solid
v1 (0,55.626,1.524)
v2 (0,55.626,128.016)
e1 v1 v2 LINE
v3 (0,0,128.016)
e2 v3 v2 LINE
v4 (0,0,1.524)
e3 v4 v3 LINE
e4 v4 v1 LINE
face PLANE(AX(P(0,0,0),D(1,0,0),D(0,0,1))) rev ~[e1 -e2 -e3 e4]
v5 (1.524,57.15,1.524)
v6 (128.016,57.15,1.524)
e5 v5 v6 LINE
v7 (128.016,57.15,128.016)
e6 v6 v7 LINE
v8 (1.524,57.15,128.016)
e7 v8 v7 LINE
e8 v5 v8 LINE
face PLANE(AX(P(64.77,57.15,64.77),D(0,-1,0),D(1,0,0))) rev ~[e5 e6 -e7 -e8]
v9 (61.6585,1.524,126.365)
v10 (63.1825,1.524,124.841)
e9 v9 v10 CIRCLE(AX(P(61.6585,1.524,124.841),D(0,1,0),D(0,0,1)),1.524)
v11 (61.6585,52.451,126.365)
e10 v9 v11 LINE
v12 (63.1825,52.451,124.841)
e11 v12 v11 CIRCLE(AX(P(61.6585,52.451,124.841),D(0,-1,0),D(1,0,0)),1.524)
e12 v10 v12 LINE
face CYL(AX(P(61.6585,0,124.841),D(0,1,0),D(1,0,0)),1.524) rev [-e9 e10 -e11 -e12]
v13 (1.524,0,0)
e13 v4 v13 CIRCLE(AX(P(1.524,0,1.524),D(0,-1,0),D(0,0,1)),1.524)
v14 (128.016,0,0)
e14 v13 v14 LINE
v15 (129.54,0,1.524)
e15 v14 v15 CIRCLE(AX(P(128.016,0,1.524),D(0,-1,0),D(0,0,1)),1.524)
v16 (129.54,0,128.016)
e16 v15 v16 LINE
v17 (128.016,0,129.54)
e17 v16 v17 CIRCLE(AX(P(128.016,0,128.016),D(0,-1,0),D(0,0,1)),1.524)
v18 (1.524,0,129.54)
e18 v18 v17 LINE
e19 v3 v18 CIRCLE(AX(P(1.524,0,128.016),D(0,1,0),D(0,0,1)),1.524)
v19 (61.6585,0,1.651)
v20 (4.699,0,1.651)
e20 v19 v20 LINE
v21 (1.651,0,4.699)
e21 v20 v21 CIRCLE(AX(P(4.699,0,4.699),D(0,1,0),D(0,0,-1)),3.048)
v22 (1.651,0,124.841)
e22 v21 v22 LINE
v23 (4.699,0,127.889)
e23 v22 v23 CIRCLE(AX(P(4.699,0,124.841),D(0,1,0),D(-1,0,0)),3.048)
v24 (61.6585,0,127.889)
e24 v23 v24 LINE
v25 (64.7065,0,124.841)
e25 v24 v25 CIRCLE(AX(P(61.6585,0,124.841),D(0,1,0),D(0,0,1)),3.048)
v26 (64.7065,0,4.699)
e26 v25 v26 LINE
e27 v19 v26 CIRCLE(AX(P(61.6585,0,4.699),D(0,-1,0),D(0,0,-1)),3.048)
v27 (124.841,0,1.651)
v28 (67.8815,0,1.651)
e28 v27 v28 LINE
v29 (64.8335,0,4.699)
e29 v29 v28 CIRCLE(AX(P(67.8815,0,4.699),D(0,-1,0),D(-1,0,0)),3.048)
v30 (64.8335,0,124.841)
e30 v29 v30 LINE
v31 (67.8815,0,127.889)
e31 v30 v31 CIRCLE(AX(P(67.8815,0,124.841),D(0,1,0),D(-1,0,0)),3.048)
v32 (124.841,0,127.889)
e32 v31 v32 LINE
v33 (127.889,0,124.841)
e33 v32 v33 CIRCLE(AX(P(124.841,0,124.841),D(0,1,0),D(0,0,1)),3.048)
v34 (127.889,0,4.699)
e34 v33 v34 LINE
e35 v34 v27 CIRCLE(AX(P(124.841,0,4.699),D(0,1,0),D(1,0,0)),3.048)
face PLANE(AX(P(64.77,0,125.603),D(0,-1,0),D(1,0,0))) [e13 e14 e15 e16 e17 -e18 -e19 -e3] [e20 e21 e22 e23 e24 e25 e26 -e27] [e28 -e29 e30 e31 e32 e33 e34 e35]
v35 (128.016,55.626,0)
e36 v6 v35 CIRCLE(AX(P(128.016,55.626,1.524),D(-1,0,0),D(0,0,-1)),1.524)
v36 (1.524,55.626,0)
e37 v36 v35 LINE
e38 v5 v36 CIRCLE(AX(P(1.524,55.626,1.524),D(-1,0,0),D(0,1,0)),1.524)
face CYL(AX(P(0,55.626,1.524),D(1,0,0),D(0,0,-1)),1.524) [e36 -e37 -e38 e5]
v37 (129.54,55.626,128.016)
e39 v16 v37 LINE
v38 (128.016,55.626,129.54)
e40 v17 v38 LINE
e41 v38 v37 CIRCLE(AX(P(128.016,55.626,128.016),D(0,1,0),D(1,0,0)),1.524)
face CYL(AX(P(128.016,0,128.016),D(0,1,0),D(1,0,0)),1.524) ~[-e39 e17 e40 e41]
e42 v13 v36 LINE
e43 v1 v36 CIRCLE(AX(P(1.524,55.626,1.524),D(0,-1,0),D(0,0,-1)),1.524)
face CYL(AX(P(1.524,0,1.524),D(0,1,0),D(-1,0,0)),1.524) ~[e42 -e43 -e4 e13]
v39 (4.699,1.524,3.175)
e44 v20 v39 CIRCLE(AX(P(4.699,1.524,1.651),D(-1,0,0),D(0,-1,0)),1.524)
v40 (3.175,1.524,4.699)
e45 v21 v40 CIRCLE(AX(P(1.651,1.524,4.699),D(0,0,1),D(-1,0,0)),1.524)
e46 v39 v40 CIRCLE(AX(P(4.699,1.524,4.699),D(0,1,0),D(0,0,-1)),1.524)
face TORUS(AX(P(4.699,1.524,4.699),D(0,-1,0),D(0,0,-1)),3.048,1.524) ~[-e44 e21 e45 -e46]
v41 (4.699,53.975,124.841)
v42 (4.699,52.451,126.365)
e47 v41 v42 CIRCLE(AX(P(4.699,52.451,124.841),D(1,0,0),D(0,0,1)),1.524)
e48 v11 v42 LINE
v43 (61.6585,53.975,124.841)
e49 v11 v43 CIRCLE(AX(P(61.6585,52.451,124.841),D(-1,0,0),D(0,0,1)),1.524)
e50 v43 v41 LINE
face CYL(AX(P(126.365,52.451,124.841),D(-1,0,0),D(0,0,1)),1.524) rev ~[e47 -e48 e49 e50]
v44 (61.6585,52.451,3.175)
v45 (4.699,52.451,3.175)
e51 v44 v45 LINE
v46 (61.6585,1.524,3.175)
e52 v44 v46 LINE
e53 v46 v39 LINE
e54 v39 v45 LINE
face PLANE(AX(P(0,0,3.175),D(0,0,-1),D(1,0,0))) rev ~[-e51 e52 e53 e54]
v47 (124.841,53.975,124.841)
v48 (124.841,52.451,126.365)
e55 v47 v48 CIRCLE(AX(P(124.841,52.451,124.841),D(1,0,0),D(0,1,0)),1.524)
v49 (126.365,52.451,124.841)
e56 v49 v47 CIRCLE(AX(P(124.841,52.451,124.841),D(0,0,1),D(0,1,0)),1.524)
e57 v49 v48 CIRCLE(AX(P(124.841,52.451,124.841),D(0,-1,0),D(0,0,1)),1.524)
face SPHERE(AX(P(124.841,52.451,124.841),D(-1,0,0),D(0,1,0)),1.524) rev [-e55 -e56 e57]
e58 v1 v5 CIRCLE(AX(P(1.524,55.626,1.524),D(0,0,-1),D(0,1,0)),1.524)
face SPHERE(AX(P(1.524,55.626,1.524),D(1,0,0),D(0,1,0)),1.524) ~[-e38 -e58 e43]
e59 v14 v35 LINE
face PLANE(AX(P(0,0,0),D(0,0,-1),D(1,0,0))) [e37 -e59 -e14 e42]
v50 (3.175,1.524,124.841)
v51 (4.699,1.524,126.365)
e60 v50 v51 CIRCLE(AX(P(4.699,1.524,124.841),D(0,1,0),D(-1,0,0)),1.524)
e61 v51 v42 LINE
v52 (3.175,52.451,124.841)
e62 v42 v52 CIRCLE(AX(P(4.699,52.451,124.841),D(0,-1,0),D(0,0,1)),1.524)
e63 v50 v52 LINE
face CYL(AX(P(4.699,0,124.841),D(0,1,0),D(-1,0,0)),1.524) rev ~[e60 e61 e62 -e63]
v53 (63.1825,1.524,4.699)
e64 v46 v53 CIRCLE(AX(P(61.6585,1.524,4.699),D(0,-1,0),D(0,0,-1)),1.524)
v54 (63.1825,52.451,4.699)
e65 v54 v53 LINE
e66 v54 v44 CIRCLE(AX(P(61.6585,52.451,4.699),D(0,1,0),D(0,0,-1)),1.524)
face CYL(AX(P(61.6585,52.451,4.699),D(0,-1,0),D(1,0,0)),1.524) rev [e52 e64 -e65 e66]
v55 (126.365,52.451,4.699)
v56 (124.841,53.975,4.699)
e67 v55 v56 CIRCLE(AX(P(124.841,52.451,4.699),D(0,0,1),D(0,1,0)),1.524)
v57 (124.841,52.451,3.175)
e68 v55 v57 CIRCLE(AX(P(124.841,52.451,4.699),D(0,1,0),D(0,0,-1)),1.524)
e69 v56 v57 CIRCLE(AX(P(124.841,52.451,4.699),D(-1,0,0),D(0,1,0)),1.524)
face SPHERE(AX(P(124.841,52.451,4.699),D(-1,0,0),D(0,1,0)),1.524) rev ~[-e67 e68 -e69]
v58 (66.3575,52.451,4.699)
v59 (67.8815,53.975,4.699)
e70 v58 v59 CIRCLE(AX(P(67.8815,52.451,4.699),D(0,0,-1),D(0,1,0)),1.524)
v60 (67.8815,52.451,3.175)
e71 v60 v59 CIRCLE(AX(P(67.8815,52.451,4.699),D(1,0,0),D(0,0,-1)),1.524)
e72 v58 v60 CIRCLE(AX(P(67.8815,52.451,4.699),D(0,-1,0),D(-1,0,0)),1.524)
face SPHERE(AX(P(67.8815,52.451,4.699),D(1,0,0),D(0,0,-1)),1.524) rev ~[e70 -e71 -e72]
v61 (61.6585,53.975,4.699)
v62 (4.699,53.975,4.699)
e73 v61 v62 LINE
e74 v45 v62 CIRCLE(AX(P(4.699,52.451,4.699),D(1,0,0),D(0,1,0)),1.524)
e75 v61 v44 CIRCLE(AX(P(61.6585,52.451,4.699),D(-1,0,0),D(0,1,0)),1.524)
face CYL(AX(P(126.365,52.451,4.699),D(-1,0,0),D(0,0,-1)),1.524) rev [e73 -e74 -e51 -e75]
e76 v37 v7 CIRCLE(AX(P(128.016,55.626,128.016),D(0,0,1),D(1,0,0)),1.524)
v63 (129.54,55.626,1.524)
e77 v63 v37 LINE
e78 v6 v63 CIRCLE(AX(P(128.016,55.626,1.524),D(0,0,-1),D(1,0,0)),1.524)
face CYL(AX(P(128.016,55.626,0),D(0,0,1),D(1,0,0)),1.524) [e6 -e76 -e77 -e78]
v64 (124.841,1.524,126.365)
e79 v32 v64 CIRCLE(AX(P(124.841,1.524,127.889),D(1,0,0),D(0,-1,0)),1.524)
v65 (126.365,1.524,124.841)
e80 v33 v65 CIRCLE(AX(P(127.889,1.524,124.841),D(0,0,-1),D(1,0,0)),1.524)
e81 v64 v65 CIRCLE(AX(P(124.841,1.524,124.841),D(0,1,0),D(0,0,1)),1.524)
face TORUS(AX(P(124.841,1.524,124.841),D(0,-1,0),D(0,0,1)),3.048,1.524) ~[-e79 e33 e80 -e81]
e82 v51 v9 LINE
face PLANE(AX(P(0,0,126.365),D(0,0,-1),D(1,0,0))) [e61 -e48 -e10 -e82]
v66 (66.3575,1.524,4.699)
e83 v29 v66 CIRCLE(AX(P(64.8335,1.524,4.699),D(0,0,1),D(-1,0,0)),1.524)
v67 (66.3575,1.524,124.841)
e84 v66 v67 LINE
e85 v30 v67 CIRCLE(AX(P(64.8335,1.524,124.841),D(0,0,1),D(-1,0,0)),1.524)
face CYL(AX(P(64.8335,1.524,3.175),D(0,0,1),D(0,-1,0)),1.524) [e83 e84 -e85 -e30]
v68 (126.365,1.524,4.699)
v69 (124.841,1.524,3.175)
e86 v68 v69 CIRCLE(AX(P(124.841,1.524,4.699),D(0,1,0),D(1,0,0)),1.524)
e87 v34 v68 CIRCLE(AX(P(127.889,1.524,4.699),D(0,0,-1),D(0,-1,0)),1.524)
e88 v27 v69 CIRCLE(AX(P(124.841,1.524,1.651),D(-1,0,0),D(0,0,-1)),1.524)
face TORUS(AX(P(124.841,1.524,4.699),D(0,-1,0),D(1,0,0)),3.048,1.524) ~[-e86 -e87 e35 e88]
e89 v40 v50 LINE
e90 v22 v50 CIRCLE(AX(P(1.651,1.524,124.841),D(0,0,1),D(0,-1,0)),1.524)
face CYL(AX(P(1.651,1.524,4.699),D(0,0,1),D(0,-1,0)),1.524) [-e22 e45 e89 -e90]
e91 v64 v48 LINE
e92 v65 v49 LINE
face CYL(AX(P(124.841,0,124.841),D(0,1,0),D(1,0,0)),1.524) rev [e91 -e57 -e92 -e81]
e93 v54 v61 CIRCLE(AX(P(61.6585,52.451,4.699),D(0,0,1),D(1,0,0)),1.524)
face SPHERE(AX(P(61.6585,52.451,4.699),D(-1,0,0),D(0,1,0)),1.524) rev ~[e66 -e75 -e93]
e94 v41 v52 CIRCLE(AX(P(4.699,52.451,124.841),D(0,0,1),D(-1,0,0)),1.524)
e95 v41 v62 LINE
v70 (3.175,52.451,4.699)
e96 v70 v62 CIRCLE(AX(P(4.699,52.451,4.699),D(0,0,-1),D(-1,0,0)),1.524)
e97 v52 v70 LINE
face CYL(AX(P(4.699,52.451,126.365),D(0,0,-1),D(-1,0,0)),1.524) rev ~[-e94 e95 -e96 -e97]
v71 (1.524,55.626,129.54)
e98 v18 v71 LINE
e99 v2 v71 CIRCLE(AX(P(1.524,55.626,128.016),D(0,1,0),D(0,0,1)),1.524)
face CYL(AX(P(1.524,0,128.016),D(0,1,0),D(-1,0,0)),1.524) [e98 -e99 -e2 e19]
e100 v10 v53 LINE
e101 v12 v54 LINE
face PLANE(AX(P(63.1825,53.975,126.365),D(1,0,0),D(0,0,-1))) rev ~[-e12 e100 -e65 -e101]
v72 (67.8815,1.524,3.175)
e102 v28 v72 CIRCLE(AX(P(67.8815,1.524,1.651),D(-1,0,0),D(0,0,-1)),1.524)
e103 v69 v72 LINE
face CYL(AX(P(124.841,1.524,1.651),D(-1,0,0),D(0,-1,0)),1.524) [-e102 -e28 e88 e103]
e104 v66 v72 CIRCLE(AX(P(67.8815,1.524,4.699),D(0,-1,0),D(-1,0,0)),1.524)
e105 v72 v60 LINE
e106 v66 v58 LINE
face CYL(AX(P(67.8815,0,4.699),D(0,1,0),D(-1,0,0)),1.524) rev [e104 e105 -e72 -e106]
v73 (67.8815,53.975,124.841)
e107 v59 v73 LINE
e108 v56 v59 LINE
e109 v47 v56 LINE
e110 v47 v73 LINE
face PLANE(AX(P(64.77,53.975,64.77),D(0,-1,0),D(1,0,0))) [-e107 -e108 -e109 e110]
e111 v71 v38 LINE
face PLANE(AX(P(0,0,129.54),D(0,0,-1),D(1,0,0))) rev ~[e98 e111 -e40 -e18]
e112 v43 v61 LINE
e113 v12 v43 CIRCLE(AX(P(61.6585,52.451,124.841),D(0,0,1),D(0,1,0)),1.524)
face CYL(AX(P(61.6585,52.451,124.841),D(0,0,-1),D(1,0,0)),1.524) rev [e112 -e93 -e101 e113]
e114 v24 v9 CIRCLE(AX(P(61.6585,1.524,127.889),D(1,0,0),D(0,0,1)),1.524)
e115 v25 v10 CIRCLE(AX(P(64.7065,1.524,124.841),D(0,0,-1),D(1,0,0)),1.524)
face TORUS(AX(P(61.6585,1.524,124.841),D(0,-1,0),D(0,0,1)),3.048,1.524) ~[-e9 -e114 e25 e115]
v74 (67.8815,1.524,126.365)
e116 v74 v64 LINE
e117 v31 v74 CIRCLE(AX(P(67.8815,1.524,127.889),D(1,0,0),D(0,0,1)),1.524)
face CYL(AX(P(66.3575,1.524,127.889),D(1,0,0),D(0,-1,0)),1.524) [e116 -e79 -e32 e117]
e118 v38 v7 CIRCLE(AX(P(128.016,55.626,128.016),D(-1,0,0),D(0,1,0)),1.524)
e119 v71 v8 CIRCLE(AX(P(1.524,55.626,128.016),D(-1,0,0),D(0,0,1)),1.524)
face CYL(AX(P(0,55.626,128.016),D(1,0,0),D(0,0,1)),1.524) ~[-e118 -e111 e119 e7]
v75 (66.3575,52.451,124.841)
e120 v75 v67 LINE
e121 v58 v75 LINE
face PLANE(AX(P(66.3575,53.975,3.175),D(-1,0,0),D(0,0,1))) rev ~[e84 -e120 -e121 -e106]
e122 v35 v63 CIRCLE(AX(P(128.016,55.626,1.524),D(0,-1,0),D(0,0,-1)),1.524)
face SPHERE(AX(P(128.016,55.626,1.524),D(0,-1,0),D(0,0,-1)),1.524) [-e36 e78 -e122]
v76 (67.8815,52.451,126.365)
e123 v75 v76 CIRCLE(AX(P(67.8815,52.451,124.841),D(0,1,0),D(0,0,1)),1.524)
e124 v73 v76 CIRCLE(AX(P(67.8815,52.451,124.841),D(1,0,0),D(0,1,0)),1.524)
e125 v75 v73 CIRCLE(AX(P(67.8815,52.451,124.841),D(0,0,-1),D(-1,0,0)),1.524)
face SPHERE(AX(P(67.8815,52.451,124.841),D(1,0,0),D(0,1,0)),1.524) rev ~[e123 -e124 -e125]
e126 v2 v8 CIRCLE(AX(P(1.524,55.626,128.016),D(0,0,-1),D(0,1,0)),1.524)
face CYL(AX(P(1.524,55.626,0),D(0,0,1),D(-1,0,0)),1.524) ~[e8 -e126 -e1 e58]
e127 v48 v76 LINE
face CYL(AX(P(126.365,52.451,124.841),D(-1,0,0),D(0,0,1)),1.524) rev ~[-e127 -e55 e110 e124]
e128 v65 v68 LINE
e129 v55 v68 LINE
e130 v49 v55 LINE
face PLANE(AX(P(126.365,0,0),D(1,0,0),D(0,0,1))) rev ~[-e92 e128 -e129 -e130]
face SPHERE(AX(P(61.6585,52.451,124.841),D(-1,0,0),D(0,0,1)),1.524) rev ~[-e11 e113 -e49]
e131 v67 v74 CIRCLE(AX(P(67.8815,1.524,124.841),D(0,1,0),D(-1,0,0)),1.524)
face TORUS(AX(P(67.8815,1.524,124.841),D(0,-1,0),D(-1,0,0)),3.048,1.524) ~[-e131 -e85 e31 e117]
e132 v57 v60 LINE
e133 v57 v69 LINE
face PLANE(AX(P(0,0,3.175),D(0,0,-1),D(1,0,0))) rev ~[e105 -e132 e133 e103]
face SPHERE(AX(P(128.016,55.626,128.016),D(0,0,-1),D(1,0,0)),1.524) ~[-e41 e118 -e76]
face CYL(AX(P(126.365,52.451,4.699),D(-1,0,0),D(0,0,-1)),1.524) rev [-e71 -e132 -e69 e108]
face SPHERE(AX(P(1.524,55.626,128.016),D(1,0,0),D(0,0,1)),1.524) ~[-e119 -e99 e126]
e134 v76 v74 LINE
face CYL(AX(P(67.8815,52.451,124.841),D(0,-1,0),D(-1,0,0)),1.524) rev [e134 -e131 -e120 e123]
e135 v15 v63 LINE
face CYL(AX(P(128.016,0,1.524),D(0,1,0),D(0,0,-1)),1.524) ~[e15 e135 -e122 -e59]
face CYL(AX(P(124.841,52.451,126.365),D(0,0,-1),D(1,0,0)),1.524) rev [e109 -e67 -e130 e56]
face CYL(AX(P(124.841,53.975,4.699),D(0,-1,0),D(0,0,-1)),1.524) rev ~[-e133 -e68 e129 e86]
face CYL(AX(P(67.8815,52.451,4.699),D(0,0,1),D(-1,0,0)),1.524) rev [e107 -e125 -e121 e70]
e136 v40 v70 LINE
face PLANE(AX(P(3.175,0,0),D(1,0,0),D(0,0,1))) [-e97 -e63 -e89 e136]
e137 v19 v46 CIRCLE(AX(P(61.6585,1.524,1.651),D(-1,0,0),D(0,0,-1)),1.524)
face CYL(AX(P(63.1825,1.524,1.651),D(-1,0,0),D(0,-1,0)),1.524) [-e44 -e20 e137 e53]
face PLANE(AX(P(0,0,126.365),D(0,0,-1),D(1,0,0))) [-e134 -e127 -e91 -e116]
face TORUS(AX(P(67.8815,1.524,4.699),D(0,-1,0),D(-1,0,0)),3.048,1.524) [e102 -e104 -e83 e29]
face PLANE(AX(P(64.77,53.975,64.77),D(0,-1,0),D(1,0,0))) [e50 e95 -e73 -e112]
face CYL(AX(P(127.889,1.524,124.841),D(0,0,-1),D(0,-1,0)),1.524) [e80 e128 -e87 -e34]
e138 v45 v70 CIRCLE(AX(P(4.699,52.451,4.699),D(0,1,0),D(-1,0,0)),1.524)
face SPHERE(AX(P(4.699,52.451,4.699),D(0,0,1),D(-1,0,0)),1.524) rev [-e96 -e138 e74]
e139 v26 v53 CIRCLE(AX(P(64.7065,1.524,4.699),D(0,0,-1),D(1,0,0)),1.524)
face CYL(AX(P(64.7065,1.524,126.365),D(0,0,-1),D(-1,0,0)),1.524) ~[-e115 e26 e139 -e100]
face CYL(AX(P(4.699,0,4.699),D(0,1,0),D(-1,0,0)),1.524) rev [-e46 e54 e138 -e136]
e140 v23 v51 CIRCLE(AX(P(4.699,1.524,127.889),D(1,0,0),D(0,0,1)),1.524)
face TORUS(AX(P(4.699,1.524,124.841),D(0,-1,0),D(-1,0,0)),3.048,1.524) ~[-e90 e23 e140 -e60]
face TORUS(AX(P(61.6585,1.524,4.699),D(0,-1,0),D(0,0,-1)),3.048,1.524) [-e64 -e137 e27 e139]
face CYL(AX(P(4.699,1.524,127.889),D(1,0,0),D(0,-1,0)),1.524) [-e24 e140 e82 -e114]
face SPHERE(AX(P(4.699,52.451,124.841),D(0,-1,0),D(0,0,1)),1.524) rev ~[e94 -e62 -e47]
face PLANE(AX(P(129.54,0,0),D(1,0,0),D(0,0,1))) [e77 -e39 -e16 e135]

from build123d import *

# Parameters (mm, degrees)
F0_W     = 129.54
F0_H     = 129.54
F1_DEPTH = 57.15
F2_T     = -3.175
F3_R     = 1.524
F4_R     = 1.524
F5_W     = 3.175
F5_H     = 1.524
F5_H_2   = 120.142
F6_DEPTH = 53.975
F7_R     = 1.524


with BuildPart() as f1:
    # F0 (on Front) → F1 (new body)
    with BuildSketch(Plane.XZ):
        with Locations((64.77, 64.77)):
            Rectangle(F0_W, F0_H)
    extrude(amount=-F1_DEPTH)

    # F2
    f2_openings = [f1.faces().sort_by_distance(p)[0] for p in [
        (64.77, 0, 64.77),
    ]]
    offset(amount=F2_T, openings=f2_openings)

    # F3
    f3_edges = [f1.edges().sort_by_distance(p)[0] for p in [
        (3.175, 26.9875, 126.365),
        (64.77, 53.975, 126.365),
        (3.175, 53.975, 64.77),
        (3.175, 26.9875, 3.175),
        (64.77, 53.975, 3.175),
        (126.365, 53.975, 64.77),
        (126.365, 26.9875, 126.365),
        (126.365, 26.9875, 3.175),
    ]]
    fillet(f3_edges, radius=F3_R)

    # F4
    f4_edges = [f1.edges().sort_by_distance(p)[0] for p in [
        (129.54, 28.575, 0),
        (64.77, 57.15, 0),
        (129.54, 57.15, 64.77),
        (129.54, 28.575, 129.54),
        (64.77, 57.15, 129.54),
        (0, 28.575, 129.54),
        (0, 57.15, 64.77),
        (0, 28.575, 0),
    ]]
    fillet(f4_edges, radius=F4_R)

    # F5 (on face) → F6 (join)
    with BuildSketch(Plane.XZ.offset(-53.975)):
        with Locations((64.77, 125.603)):
            Rectangle(F5_W, F5_H)
        with Locations((64.77, 64.77)):
            Rectangle(F5_W, F5_H_2)
        with Locations((64.77, 3.937)):
            Rectangle(F5_W, F5_H)
    extrude(amount=F6_DEPTH)

    # F7
    f7_edges = [f1.edges().sort_by_distance(p)[0] for p in [
        (33.94075, 0, 126.365),
        (63.1825, 0, 64.77),
        (63.1825, 53.528631, 125.918631),
        (63.1825, 53.975, 64.77),
        (63.1825, 53.528631, 3.621369),
        (63.1825, 26.2255, 3.175),
        (63.1825, 26.2255, 126.365),
        (95.59925, 0, 126.365),
        (66.3575, 26.2255, 126.365),
        (95.59925, 52.451, 126.365),
        (124.841, 26.2255, 126.365),
        (126.365, 0, 64.77),
        (126.365, 26.2255, 4.699),
        (126.365, 26.2255, 124.841),
        (126.365, 52.451, 64.77),
        (3.175, 0, 64.77),
        (3.621369, 0, 125.918631),
        (33.94075, 0, 3.175),
        (3.621369, 0, 3.621369),
        (125.918631, 0, 125.918631),
        (125.918631, 0, 3.621369),
        (95.59925, 0, 3.175),
        (66.3575, 0, 64.77),
        (66.3575, 26.2255, 3.175),
        (66.3575, 53.528631, 3.621369),
        (66.3575, 53.975, 64.77),
        (66.3575, 53.528631, 125.918631),
    ]]
    fillet(f7_edges, radius=F7_R)


solid = f1.part
